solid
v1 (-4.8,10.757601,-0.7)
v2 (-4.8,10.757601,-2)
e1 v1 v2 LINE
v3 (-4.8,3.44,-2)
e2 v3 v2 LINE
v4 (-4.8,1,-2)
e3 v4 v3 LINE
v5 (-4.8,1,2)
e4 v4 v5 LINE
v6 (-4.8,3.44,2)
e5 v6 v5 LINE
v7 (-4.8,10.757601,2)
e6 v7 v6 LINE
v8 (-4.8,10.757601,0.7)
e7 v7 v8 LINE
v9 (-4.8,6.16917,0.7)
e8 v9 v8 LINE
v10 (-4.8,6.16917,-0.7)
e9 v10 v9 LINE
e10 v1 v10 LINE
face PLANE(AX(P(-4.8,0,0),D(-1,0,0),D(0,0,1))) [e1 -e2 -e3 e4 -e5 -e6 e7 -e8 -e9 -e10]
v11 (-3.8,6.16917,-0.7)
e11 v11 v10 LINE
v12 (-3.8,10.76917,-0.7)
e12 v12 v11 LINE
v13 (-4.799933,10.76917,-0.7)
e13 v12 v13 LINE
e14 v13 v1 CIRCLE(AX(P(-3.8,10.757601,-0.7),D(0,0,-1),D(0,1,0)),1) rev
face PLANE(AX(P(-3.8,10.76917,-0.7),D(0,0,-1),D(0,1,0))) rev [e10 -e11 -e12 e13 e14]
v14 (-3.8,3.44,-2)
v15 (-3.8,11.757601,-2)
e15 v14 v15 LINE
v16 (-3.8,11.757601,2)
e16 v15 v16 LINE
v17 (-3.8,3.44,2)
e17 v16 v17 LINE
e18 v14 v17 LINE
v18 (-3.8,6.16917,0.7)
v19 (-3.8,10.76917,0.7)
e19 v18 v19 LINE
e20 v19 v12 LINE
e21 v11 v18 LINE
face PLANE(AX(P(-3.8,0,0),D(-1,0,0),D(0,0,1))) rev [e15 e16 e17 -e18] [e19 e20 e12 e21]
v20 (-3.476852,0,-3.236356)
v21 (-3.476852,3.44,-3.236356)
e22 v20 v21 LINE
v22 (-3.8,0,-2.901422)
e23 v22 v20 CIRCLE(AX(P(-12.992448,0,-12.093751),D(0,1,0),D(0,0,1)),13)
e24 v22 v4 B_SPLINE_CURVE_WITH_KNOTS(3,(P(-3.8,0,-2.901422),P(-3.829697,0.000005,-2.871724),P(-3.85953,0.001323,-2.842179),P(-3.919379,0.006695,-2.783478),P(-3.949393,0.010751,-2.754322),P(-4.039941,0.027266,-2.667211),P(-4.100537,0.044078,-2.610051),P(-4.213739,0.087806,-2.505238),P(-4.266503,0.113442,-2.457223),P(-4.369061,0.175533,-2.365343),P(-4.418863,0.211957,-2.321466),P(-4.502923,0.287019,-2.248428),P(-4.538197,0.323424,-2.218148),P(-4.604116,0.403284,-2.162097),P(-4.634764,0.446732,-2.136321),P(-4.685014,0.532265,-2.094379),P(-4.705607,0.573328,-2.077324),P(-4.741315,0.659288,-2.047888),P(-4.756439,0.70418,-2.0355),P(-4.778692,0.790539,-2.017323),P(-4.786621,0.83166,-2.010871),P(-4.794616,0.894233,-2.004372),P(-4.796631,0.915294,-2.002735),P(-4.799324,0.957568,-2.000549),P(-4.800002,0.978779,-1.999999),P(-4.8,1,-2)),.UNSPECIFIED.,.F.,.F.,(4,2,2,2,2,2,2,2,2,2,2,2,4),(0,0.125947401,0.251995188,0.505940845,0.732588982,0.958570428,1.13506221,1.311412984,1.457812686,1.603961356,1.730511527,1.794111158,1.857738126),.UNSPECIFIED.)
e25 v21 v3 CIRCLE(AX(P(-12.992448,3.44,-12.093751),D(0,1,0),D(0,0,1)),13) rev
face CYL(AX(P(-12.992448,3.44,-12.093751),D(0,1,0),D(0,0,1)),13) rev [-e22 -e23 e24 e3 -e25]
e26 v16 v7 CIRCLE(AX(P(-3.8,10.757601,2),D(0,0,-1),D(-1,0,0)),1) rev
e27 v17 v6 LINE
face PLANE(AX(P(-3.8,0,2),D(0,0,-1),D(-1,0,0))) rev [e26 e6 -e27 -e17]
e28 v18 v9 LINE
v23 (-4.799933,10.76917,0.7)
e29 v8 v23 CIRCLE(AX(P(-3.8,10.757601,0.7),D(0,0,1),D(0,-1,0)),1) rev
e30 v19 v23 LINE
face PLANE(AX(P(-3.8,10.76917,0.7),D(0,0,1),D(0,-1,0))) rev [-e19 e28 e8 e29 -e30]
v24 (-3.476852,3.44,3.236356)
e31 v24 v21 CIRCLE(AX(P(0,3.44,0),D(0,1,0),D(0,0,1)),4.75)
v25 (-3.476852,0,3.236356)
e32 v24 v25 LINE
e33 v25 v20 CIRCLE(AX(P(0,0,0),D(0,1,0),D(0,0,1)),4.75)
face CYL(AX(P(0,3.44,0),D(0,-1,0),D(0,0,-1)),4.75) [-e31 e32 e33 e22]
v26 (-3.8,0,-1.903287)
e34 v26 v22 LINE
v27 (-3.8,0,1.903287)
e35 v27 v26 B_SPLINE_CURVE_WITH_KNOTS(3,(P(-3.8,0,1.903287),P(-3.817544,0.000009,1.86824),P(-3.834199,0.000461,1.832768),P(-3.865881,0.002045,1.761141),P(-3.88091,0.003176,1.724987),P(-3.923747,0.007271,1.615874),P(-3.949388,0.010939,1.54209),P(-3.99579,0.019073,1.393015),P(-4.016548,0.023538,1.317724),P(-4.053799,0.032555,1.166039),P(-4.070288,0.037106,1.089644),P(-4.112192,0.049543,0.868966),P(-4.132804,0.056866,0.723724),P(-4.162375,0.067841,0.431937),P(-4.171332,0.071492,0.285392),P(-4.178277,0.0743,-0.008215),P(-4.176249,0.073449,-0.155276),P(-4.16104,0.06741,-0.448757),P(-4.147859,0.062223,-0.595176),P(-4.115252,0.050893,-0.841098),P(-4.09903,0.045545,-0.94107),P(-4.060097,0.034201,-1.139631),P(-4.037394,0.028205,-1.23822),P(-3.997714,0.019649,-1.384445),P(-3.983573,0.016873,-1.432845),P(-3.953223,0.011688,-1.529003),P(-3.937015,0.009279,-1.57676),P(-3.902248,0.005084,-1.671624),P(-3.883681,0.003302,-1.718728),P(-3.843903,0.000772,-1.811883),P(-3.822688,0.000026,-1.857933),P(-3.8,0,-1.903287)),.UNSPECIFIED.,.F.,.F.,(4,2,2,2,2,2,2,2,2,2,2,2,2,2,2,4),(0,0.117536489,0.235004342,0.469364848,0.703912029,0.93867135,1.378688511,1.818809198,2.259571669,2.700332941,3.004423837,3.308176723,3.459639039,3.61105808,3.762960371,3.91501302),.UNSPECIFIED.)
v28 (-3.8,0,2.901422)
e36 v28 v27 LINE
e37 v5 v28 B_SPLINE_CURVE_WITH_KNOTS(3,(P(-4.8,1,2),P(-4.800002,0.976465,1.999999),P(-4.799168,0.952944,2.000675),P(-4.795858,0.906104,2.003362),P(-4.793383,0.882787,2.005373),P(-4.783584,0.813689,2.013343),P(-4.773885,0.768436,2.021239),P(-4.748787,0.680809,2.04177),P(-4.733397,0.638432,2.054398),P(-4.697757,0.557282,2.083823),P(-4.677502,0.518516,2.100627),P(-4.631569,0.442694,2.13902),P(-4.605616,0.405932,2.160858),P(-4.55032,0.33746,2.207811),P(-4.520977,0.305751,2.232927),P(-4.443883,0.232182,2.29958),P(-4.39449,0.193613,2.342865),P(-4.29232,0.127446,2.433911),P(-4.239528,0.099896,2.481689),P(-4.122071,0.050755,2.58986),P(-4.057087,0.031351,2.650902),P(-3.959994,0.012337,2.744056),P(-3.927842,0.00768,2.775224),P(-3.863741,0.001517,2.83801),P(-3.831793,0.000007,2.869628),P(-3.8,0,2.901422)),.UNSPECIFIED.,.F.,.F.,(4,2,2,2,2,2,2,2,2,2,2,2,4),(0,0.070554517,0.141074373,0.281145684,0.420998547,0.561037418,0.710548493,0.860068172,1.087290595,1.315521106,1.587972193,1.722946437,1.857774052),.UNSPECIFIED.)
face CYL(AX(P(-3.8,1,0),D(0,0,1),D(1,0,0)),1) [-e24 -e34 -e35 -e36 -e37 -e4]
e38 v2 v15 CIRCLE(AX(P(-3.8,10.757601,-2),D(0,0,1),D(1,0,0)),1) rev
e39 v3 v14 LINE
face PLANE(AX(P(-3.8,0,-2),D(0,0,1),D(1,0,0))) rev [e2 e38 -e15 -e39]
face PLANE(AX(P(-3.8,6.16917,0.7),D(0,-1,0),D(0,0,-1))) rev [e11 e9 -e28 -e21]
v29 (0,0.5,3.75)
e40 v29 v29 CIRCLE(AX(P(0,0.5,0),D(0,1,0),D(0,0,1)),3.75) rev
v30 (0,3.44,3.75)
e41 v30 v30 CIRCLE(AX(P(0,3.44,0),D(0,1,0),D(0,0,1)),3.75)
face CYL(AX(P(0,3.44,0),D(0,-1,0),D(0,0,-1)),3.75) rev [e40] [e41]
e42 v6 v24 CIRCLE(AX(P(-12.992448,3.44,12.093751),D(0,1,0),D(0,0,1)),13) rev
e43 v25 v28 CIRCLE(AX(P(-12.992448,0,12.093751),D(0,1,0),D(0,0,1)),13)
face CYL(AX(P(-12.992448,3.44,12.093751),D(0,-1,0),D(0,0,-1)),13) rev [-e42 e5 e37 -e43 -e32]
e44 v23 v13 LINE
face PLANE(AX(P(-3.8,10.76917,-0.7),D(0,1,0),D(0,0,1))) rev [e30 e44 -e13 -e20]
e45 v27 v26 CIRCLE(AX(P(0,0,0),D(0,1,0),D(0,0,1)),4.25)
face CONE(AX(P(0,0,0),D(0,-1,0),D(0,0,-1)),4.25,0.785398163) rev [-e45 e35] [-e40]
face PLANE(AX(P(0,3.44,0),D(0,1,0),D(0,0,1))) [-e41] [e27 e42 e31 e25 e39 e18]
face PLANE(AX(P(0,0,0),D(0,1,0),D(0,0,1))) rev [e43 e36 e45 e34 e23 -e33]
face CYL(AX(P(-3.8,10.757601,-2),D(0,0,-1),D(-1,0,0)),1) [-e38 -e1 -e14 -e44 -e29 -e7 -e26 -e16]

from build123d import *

# Parameters (mm, degrees)
SKETCH2_R           = 4.75
SKETCH2_R_2         = 3.75
BOSS_EXTRUDE1_DEPTH = 3.44
SKETCH3_W           = 4
SKETCH3_H           = 11.757601451
BOSS_EXTRUDE2_DEPTH = 1
SKETCH4_W           = 1.4
SKETCH4_H           = 4.6
CUT_EXTRUDE1_DEPTH  = 1
FILLET1_R           = 13
CHAMFER1_SIZE       = 0.5
FILLET2_R           = 1


with BuildPart() as part:
    # Sketch2 → Boss-Extrude1 (new body)
    with BuildSketch(Plane(origin=(0, 0, 0), x_dir=(1, 0, 0), z_dir=(0, 1, 0))):
        with Locations(Location((0, 0, 0), (0, 0, 270))):
            Circle(SKETCH2_R)
        with Locations(Location((0, 0, 0), (0, 0, 270))):
            Circle(SKETCH2_R_2, mode=Mode.SUBTRACT)
    extrude(amount=BOSS_EXTRUDE1_DEPTH)

    # Sketch3 → Boss-Extrude2 (add)
    with BuildSketch(Plane(origin=(-4.8, 0, 0), x_dir=(0, 0, -1), z_dir=(1, 0, 0))):
        with Locations((0, 5.878800726)):
            Rectangle(SKETCH3_W, SKETCH3_H)
    extrude(amount=BOSS_EXTRUDE2_DEPTH)

    # Sketch4 → Cut-Extrude1 (cut)
    with BuildSketch(Plane.ZY.offset(4.8)):
        with Locations((0, 8.46916965)):
            Rectangle(SKETCH4_W, SKETCH4_H)
    extrude(amount=-CUT_EXTRUDE1_DEPTH, mode=Mode.SUBTRACT)

    # Fillet1
    # the kernel refuses this fillet: 13 mm, written as the material it adds along each edge
    with BuildSketch(Plane(origin=(-4.308421985, 3.44, 2), x_dir=(0.5581025465687688, 0, 0.8297719852546573), z_dir=(0, -1, 0))) as fillet1_piece_1:
        with BuildLine():
            CenterArc((3.528934631, 12.839109145), FILLET1_R, 252.988692503, 7.987692365)
            Line((-0.274350942, 0.407897665), (-0.350416654, 0.159273436))
            ThreePointArc((-0.350416654, 0.159273436), (-0.352916187, 0.058842171), (-0.215740716, -0.145106662))
            Line((-0.215740716, -0.145106662), (0.0407788, -0.256782183))
            ThreePointArc((0.0407788, -0.256782183), (0.744997311, -0.201212957), (1.449215822, -0.256782183))
            Line((1.449215822, -0.256782183), (1.489994622, 0))
        make_face()
    extrude(amount=3.44)
    with BuildSketch(Plane(origin=(-4.308421985, 3.44, -2), x_dir=(0.5581025465687675, 0, -0.8297719852546583), z_dir=(0, -1, 0))) as fillet1_piece_2:
        with BuildLine():
            CenterArc((3.528934631, -12.839109145), FILLET1_R, 99.023615132, 7.987692365)
            Line((-0.274350942, -0.407897665), (-0.350416654, -0.159273436))
            ThreePointArc((-0.350416654, -0.159273436), (-0.352916187, -0.058842171), (-0.215740716, 0.145106662))
            Line((-0.215740716, 0.145106662), (0.0407788, 0.256782183))
            ThreePointArc((0.0407788, 0.256782183), (0.744997311, 0.201212957), (1.449215822, 0.256782183))
            Line((1.449215822, 0.256782183), (1.489994622, 0))
        make_face()
    extrude(amount=3.44)

    # Chamfer1
    chamfer1_edges = [part.edges().sort_by_distance(p)[0] for p in [
        (0, 0, -3.75),
    ]]
    chamfer(chamfer1_edges, length=CHAMFER1_SIZE)

    # Fillet2
    # the kernel refuses this fillet: 1 mm, written as the material it takes off along each edge
    with BuildSketch(Plane(origin=(-4.8, 0, 4.5), x_dir=(1, 0, 0), z_dir=(0, 0, -1))) as fillet2_piece_1:
        with BuildLine():
            CenterArc((FILLET2_R, -FILLET2_R), FILLET2_R, 90, 90)
            Line((0, -FILLET2_R), (0, 0))
            Line((0, 0), (FILLET2_R, 0))
        make_face()
    extrude(amount=9, mode=Mode.SUBTRACT)
    with BuildSketch(Plane(origin=(-4.8, 11.757601451, -4.5), x_dir=(0, -1, 0), z_dir=(0, 0, 1))) as fillet2_piece_2:
        with BuildLine():
            CenterArc((FILLET2_R, FILLET2_R), FILLET2_R, 180, 90)
            Line((0, FILLET2_R), (0, 0))
            Line((0, 0), (FILLET2_R, 0))
        make_face()
    extrude(amount=9, mode=Mode.SUBTRACT)


solid = part.part
